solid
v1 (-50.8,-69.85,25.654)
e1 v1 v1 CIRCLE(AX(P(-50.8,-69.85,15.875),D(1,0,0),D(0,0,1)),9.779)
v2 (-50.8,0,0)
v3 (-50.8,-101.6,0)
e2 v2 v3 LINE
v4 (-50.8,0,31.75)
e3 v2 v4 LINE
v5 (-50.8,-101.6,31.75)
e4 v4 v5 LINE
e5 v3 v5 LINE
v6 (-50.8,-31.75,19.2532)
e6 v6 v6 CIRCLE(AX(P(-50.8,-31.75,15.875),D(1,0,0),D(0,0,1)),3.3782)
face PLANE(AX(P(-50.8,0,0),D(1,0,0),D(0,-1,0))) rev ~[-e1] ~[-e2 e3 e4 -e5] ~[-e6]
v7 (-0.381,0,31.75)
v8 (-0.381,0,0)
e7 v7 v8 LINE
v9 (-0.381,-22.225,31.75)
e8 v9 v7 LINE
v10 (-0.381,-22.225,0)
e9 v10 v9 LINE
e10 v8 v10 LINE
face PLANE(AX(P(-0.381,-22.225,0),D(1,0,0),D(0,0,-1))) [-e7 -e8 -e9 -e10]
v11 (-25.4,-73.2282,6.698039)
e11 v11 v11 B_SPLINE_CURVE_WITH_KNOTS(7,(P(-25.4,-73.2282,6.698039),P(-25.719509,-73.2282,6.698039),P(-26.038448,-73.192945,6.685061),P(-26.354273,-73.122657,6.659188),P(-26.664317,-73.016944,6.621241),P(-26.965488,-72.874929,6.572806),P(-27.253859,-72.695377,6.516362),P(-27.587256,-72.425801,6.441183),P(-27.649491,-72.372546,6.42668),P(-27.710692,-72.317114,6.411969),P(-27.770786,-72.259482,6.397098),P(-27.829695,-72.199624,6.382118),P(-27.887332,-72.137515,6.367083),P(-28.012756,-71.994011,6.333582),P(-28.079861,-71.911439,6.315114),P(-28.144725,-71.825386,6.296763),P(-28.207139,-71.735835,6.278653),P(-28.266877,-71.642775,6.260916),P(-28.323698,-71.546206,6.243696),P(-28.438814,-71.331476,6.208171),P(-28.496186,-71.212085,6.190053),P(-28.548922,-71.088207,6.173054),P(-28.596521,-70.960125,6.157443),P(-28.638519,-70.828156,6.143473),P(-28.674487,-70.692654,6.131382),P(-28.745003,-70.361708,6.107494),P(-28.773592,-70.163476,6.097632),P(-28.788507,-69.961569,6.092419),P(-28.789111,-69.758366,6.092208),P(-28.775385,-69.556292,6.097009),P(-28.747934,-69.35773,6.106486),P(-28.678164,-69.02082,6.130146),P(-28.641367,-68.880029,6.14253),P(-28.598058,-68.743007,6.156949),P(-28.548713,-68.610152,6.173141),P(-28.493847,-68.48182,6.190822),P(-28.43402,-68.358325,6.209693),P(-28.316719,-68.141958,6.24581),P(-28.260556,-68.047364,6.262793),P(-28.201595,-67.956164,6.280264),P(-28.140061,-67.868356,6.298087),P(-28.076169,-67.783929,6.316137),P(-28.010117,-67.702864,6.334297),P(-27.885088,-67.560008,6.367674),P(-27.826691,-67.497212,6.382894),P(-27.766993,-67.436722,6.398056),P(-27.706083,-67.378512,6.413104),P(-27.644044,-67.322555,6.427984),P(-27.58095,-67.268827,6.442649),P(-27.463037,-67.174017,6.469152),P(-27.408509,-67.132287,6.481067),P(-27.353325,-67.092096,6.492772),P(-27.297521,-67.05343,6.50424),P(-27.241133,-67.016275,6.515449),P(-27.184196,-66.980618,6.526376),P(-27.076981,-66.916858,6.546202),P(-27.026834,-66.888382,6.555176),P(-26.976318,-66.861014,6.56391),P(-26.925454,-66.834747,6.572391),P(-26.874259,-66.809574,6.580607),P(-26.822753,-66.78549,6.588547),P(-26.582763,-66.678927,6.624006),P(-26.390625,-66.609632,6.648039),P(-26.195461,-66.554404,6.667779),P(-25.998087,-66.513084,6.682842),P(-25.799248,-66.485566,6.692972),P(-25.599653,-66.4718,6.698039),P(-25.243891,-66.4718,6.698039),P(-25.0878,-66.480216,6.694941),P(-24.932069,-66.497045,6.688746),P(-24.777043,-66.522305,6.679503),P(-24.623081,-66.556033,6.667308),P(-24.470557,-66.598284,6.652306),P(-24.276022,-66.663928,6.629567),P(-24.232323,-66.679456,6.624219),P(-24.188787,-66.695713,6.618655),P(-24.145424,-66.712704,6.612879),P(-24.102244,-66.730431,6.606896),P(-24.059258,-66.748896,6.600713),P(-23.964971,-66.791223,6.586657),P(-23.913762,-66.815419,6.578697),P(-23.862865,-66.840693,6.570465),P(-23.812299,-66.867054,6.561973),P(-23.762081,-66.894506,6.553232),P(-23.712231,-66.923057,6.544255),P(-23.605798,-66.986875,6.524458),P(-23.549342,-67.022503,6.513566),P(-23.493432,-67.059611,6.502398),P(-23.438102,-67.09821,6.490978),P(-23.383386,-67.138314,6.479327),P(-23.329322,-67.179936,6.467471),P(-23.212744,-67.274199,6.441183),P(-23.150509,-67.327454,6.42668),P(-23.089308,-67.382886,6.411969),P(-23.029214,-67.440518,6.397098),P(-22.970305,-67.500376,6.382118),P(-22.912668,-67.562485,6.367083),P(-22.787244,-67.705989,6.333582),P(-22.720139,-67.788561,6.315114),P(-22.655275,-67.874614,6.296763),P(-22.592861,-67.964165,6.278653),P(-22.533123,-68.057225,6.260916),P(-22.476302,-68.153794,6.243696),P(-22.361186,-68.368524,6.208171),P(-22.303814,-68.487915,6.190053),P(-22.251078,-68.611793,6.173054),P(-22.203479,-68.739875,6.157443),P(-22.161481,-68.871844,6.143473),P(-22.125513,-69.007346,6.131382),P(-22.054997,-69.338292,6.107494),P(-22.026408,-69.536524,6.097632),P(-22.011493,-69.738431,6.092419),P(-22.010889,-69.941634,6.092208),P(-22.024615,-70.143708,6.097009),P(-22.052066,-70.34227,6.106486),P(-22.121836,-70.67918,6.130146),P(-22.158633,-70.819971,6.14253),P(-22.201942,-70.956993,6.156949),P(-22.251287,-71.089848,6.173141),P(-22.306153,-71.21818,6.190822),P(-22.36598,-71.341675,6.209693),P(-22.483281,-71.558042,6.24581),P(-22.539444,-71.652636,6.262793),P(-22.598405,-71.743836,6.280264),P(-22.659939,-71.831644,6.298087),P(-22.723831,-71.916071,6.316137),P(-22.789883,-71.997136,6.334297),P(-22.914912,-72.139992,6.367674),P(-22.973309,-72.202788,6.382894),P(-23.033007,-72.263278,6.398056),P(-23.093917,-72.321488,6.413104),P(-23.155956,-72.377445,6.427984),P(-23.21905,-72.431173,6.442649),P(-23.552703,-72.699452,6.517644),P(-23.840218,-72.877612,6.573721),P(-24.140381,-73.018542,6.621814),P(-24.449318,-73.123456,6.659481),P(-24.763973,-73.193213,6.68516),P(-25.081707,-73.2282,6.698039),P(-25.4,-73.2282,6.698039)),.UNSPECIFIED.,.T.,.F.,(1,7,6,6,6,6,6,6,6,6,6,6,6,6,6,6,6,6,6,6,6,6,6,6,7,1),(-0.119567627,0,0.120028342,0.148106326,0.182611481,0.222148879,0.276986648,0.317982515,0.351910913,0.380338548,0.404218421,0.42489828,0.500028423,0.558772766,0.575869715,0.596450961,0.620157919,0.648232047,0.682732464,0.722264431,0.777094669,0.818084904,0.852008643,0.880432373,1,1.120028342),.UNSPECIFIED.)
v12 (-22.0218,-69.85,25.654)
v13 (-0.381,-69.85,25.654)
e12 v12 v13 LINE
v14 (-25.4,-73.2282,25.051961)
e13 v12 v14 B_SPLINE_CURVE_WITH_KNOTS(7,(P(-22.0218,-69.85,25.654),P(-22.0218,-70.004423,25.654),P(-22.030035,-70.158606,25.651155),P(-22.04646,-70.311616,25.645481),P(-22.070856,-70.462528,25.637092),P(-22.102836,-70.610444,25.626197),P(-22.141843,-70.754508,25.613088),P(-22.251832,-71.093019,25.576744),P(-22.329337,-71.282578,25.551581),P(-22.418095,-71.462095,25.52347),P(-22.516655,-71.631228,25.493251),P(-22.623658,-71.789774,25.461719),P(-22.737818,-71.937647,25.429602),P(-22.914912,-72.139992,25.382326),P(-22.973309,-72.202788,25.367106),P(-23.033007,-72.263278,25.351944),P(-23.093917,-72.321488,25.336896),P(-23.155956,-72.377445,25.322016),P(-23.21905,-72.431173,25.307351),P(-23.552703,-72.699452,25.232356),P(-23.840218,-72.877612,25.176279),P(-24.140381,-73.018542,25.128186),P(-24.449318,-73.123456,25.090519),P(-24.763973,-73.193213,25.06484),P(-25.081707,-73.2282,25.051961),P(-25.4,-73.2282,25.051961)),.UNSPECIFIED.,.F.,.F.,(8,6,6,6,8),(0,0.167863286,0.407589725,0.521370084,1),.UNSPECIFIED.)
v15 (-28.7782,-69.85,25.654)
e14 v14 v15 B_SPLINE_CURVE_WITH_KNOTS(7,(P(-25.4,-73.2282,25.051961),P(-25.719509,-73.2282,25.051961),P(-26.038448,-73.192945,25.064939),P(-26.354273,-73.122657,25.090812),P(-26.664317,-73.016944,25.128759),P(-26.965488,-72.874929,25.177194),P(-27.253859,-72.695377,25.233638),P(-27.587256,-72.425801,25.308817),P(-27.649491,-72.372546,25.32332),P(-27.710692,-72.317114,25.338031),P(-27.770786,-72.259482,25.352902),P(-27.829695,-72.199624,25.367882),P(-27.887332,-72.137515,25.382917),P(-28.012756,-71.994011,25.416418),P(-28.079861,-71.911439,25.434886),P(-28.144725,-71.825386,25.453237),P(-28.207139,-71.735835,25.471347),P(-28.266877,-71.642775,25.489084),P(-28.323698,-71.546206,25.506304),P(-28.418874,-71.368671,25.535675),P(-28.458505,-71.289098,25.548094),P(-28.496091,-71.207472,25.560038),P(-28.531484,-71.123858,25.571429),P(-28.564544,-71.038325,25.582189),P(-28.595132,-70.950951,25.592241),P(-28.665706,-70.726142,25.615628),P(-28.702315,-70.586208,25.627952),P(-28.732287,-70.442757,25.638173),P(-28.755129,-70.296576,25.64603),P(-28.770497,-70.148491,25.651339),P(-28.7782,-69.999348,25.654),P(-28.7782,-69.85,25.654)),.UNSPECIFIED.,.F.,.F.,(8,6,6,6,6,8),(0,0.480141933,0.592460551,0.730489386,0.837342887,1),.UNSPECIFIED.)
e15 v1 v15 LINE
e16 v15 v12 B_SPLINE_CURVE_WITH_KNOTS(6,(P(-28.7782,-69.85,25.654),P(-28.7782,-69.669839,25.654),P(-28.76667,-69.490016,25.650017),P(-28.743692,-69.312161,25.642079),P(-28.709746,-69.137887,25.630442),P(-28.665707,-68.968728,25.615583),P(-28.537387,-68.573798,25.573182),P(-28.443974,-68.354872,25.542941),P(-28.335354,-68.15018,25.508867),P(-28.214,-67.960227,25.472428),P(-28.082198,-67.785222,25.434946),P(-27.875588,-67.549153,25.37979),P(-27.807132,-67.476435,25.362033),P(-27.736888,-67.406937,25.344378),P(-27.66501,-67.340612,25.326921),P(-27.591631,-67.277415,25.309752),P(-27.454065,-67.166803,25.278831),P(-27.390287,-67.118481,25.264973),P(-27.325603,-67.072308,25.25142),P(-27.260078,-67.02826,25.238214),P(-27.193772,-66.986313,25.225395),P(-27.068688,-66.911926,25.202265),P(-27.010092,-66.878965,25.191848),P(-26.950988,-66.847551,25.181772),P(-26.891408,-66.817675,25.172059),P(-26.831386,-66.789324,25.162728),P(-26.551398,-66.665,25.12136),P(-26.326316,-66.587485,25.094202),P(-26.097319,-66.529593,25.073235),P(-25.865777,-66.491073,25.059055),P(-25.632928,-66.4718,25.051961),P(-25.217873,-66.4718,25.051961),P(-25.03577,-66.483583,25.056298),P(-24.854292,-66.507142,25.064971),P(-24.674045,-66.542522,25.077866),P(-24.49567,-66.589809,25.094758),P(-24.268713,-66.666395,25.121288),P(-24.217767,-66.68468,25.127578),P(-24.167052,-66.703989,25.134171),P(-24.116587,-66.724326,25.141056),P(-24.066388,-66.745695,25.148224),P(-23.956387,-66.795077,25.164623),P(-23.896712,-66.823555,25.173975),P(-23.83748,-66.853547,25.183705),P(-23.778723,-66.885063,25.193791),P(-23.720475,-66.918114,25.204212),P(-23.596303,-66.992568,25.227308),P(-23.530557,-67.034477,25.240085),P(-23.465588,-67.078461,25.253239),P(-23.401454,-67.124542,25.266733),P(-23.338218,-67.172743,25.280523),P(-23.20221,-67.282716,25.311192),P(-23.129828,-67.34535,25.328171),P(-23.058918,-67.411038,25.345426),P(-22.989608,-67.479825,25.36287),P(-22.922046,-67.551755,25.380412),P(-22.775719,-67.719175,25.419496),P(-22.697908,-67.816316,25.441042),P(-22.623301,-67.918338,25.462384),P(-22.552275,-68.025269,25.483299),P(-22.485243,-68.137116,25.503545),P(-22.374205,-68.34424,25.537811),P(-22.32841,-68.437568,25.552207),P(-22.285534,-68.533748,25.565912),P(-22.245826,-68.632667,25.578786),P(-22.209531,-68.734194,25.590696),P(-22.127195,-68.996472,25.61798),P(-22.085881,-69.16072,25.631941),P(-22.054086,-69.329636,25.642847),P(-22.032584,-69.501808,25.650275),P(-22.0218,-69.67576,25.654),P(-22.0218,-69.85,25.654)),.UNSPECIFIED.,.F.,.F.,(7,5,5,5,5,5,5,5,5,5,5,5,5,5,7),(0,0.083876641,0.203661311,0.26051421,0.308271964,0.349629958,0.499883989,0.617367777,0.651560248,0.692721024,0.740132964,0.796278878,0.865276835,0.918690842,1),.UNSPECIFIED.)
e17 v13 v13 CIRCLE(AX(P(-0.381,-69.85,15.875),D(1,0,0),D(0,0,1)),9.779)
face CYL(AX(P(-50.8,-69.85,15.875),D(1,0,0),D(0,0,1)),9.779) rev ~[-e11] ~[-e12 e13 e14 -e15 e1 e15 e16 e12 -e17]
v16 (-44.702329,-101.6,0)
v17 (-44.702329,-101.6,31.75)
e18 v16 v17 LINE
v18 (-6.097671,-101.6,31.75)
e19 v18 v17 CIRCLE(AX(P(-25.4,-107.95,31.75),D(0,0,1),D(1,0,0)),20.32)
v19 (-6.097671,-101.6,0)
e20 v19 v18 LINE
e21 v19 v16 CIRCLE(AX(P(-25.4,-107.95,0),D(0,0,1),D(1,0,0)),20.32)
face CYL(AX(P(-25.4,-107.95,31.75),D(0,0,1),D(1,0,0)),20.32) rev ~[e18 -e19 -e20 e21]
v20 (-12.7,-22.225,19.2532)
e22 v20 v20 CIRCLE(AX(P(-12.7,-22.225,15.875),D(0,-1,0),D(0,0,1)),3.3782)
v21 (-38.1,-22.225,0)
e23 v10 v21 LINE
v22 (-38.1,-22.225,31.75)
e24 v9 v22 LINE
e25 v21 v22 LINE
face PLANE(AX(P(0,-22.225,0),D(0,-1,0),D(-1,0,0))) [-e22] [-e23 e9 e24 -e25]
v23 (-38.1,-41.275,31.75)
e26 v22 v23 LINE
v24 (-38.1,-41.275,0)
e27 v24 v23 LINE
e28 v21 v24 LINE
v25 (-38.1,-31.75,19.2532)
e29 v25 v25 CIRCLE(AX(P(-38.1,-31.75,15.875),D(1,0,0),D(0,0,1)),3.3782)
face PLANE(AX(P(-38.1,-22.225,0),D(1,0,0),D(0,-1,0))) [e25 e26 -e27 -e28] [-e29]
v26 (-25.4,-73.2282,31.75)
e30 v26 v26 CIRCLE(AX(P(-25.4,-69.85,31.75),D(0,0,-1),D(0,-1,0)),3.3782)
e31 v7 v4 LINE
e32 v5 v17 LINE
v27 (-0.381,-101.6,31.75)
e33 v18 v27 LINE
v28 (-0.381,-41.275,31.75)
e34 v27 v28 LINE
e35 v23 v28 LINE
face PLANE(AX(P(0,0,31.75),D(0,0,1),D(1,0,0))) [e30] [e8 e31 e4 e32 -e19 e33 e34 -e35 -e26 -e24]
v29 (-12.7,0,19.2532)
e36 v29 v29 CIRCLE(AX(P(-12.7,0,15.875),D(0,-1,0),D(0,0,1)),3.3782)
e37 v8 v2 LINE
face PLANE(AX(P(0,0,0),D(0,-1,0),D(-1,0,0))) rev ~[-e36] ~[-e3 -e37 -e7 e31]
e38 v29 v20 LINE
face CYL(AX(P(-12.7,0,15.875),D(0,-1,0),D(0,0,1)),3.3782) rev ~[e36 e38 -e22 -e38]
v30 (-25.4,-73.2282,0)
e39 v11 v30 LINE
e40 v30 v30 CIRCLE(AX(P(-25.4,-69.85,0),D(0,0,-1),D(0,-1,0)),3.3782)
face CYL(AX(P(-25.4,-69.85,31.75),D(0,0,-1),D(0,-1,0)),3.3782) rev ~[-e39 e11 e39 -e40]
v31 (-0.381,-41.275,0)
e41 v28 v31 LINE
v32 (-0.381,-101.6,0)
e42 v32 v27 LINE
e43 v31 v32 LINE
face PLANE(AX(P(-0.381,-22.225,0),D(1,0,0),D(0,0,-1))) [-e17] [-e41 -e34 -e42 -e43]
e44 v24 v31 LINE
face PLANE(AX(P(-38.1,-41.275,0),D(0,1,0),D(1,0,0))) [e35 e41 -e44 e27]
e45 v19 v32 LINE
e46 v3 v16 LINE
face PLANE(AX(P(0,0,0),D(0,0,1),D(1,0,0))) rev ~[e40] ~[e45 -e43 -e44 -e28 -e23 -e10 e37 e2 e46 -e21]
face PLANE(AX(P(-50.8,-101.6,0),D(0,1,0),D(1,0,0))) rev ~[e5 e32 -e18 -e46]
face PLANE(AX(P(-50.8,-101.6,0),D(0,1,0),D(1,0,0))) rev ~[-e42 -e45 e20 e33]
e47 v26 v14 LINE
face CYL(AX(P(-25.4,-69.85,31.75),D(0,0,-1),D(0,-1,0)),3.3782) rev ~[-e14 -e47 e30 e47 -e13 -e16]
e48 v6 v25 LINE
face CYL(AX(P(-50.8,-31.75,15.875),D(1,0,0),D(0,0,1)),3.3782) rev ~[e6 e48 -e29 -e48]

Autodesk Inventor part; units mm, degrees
ref_plane "YZ Plane" through (0, 0, 0) normal (1, 0, 0) x (0, 1, 0)
ref_plane "XZ Plane" through (0, 0, 0) normal (0, 1, 0) x (-1, 0, 0)
ref_plane "XY Plane" through (0, 0, 0) normal (0, 0, 1) x (1, 0, 0)
sketch "Sketch1" plane through (0, 0, 0) normal (0, 0, 1) x (1, 0, 0)
  line L0 (0, 0) -> (-50.8, 0)
  line L1 (-50.8, 0) -> (-50.8, -101.6)
  line L2 (-50.8, -101.6) -> (0, -101.6)
  line L3 (0, -22.225) -> (-38.1, -22.225)
  line L4 (-38.1, -22.225) -> (-38.1, -41.275)
  line L5 (-38.1, -41.275) -> (0, -41.275)
  line L6 (0, -101.6) -> (0, -41.275)
  line L7 (0, -22.225) -> (0, 0)
  dimension "d0" = 101.6
  dimension "d1" = 50.8
  dimension "d4" = 22.225
  dimension "d5" = 38.1
  dimension "d6" = 19.05
extrude "Extrusion1" add sketch "Sketch1" along normal blind 31.75
sketch "Sketch2" plane through (0, -22.225, 0) normal (1, 0, 0) x (0, 0, -1)
  line L0 (-31.75, 0) -> (-31.75, 22.225) projected
  line L1 (0, 22.225) -> (0, -79.375) projected
  line L2 (-31.75, 22.225) -> (0, 22.225)
  line L3 (0, 22.225) -> (0, -79.375)
  line L4 (0, -79.375) -> (-31.75, -79.375)
  line L5 (-31.75, -79.375) -> (-31.75, 22.225)
extrude "Extrusion2" cut sketch "Sketch2" against normal blind 0.381
sketch "Sketch3" plane through (-50.8, 0, 31.75) normal (0, 1, 0) x (1, 0, 0)
  line L0 (0, 31.75) -> (0, 0) projected
  line L1 (50.419, 31.75) -> (0, 31.75) projected
  point P0 (50.8, 31.75)
  point P1 (38.1, 15.875)
  dimension "d9" = 38.1
  dimension "d10" = 15.875
hole "Hole1" at (-12.7, 0, 15.875) direction (0, -1, 0) diameter 6.7564 end up to surface clearance for "Flat Head Machine Screw (82)" size "1/4" standard "Ansi Unified Screw Threads"
sketch "Sketch4" plane through (-50.8, -101.6, 0) normal (-1, 0, 0) x (0, 0, 1)
  line L0 (0, 101.6) -> (0, 0) projected
  line L1 (0, 101.6) -> (31.75, 101.6) projected
  point P0 (15.875, 69.85)
  dimension "d18" = 15.875
  dimension "d19" = 31.75
hole "Hole2" at (-50.8, -31.75, 15.875) direction (1, 0, 0) diameter 6.7564 end through all clearance for "Hex Head Bolt" size "1/4" standard "Ansi Unified Screw Threads"
sketch "Sketch5" plane through (-50.8, -101.6, 0) normal (-1, 0, 0) x (0, 0, 1)
  line L0 (0, 101.6) -> (0, 0) projected
  line L1 (0, 101.6) -> (31.75, 101.6) projected
  point P0 (15.875, 31.75)
  dimension "d27" = 15.875
  dimension "d28" = 69.85
hole "Hole3" at (-50.8, -69.85, 15.875) direction (1, 0, 0) diameter 19.558 end through all
sketch "Sketch6" plane through (0, 0, 31.75) normal (0, 0, 1) x (1, 0, 0)
  line L0 (-0.381, 0) -> (-50.8, 0) projected
  line L1 (-50.8, 0) -> (-50.8, -101.6) projected
  point P0 (0, 0)
  point P1 (-25.4, -69.85)
  dimension "d36" = 69.85
  dimension "d37" = 25.4
hole "Hole4" at (-25.4, -69.85, 31.75) direction (0, 0, -1) diameter 6.7564 end through all clearance for "Hex Head Bolt" size "1/4" standard "Ansi Unified Screw Threads"
sketch "Sketch7" plane through (0, 0, 31.75) normal (0, 0, 1) x (1, 0, 0)
  circle A0 centre (-25.4, -107.95) radius 20.32
  line L0 (-0.381, 0) -> (-50.8, 0) projected
  line L1 (-50.8, 0) -> (-50.8, -101.6) projected
  point P0 (0, 0)
  dimension "d45" = 107.95
  dimension "d46" = 25.4
  dimension "d47" = 40.64
extrude "Extrusion3" cut sketch "Sketch7" against normal through all
equation "\"d10\" = 0.5 * width"
equation "\"d18\" = 0.5 * width"
equation "\"width\" = 31.75"
properties part number "Over Support For Arm With Delrin"
